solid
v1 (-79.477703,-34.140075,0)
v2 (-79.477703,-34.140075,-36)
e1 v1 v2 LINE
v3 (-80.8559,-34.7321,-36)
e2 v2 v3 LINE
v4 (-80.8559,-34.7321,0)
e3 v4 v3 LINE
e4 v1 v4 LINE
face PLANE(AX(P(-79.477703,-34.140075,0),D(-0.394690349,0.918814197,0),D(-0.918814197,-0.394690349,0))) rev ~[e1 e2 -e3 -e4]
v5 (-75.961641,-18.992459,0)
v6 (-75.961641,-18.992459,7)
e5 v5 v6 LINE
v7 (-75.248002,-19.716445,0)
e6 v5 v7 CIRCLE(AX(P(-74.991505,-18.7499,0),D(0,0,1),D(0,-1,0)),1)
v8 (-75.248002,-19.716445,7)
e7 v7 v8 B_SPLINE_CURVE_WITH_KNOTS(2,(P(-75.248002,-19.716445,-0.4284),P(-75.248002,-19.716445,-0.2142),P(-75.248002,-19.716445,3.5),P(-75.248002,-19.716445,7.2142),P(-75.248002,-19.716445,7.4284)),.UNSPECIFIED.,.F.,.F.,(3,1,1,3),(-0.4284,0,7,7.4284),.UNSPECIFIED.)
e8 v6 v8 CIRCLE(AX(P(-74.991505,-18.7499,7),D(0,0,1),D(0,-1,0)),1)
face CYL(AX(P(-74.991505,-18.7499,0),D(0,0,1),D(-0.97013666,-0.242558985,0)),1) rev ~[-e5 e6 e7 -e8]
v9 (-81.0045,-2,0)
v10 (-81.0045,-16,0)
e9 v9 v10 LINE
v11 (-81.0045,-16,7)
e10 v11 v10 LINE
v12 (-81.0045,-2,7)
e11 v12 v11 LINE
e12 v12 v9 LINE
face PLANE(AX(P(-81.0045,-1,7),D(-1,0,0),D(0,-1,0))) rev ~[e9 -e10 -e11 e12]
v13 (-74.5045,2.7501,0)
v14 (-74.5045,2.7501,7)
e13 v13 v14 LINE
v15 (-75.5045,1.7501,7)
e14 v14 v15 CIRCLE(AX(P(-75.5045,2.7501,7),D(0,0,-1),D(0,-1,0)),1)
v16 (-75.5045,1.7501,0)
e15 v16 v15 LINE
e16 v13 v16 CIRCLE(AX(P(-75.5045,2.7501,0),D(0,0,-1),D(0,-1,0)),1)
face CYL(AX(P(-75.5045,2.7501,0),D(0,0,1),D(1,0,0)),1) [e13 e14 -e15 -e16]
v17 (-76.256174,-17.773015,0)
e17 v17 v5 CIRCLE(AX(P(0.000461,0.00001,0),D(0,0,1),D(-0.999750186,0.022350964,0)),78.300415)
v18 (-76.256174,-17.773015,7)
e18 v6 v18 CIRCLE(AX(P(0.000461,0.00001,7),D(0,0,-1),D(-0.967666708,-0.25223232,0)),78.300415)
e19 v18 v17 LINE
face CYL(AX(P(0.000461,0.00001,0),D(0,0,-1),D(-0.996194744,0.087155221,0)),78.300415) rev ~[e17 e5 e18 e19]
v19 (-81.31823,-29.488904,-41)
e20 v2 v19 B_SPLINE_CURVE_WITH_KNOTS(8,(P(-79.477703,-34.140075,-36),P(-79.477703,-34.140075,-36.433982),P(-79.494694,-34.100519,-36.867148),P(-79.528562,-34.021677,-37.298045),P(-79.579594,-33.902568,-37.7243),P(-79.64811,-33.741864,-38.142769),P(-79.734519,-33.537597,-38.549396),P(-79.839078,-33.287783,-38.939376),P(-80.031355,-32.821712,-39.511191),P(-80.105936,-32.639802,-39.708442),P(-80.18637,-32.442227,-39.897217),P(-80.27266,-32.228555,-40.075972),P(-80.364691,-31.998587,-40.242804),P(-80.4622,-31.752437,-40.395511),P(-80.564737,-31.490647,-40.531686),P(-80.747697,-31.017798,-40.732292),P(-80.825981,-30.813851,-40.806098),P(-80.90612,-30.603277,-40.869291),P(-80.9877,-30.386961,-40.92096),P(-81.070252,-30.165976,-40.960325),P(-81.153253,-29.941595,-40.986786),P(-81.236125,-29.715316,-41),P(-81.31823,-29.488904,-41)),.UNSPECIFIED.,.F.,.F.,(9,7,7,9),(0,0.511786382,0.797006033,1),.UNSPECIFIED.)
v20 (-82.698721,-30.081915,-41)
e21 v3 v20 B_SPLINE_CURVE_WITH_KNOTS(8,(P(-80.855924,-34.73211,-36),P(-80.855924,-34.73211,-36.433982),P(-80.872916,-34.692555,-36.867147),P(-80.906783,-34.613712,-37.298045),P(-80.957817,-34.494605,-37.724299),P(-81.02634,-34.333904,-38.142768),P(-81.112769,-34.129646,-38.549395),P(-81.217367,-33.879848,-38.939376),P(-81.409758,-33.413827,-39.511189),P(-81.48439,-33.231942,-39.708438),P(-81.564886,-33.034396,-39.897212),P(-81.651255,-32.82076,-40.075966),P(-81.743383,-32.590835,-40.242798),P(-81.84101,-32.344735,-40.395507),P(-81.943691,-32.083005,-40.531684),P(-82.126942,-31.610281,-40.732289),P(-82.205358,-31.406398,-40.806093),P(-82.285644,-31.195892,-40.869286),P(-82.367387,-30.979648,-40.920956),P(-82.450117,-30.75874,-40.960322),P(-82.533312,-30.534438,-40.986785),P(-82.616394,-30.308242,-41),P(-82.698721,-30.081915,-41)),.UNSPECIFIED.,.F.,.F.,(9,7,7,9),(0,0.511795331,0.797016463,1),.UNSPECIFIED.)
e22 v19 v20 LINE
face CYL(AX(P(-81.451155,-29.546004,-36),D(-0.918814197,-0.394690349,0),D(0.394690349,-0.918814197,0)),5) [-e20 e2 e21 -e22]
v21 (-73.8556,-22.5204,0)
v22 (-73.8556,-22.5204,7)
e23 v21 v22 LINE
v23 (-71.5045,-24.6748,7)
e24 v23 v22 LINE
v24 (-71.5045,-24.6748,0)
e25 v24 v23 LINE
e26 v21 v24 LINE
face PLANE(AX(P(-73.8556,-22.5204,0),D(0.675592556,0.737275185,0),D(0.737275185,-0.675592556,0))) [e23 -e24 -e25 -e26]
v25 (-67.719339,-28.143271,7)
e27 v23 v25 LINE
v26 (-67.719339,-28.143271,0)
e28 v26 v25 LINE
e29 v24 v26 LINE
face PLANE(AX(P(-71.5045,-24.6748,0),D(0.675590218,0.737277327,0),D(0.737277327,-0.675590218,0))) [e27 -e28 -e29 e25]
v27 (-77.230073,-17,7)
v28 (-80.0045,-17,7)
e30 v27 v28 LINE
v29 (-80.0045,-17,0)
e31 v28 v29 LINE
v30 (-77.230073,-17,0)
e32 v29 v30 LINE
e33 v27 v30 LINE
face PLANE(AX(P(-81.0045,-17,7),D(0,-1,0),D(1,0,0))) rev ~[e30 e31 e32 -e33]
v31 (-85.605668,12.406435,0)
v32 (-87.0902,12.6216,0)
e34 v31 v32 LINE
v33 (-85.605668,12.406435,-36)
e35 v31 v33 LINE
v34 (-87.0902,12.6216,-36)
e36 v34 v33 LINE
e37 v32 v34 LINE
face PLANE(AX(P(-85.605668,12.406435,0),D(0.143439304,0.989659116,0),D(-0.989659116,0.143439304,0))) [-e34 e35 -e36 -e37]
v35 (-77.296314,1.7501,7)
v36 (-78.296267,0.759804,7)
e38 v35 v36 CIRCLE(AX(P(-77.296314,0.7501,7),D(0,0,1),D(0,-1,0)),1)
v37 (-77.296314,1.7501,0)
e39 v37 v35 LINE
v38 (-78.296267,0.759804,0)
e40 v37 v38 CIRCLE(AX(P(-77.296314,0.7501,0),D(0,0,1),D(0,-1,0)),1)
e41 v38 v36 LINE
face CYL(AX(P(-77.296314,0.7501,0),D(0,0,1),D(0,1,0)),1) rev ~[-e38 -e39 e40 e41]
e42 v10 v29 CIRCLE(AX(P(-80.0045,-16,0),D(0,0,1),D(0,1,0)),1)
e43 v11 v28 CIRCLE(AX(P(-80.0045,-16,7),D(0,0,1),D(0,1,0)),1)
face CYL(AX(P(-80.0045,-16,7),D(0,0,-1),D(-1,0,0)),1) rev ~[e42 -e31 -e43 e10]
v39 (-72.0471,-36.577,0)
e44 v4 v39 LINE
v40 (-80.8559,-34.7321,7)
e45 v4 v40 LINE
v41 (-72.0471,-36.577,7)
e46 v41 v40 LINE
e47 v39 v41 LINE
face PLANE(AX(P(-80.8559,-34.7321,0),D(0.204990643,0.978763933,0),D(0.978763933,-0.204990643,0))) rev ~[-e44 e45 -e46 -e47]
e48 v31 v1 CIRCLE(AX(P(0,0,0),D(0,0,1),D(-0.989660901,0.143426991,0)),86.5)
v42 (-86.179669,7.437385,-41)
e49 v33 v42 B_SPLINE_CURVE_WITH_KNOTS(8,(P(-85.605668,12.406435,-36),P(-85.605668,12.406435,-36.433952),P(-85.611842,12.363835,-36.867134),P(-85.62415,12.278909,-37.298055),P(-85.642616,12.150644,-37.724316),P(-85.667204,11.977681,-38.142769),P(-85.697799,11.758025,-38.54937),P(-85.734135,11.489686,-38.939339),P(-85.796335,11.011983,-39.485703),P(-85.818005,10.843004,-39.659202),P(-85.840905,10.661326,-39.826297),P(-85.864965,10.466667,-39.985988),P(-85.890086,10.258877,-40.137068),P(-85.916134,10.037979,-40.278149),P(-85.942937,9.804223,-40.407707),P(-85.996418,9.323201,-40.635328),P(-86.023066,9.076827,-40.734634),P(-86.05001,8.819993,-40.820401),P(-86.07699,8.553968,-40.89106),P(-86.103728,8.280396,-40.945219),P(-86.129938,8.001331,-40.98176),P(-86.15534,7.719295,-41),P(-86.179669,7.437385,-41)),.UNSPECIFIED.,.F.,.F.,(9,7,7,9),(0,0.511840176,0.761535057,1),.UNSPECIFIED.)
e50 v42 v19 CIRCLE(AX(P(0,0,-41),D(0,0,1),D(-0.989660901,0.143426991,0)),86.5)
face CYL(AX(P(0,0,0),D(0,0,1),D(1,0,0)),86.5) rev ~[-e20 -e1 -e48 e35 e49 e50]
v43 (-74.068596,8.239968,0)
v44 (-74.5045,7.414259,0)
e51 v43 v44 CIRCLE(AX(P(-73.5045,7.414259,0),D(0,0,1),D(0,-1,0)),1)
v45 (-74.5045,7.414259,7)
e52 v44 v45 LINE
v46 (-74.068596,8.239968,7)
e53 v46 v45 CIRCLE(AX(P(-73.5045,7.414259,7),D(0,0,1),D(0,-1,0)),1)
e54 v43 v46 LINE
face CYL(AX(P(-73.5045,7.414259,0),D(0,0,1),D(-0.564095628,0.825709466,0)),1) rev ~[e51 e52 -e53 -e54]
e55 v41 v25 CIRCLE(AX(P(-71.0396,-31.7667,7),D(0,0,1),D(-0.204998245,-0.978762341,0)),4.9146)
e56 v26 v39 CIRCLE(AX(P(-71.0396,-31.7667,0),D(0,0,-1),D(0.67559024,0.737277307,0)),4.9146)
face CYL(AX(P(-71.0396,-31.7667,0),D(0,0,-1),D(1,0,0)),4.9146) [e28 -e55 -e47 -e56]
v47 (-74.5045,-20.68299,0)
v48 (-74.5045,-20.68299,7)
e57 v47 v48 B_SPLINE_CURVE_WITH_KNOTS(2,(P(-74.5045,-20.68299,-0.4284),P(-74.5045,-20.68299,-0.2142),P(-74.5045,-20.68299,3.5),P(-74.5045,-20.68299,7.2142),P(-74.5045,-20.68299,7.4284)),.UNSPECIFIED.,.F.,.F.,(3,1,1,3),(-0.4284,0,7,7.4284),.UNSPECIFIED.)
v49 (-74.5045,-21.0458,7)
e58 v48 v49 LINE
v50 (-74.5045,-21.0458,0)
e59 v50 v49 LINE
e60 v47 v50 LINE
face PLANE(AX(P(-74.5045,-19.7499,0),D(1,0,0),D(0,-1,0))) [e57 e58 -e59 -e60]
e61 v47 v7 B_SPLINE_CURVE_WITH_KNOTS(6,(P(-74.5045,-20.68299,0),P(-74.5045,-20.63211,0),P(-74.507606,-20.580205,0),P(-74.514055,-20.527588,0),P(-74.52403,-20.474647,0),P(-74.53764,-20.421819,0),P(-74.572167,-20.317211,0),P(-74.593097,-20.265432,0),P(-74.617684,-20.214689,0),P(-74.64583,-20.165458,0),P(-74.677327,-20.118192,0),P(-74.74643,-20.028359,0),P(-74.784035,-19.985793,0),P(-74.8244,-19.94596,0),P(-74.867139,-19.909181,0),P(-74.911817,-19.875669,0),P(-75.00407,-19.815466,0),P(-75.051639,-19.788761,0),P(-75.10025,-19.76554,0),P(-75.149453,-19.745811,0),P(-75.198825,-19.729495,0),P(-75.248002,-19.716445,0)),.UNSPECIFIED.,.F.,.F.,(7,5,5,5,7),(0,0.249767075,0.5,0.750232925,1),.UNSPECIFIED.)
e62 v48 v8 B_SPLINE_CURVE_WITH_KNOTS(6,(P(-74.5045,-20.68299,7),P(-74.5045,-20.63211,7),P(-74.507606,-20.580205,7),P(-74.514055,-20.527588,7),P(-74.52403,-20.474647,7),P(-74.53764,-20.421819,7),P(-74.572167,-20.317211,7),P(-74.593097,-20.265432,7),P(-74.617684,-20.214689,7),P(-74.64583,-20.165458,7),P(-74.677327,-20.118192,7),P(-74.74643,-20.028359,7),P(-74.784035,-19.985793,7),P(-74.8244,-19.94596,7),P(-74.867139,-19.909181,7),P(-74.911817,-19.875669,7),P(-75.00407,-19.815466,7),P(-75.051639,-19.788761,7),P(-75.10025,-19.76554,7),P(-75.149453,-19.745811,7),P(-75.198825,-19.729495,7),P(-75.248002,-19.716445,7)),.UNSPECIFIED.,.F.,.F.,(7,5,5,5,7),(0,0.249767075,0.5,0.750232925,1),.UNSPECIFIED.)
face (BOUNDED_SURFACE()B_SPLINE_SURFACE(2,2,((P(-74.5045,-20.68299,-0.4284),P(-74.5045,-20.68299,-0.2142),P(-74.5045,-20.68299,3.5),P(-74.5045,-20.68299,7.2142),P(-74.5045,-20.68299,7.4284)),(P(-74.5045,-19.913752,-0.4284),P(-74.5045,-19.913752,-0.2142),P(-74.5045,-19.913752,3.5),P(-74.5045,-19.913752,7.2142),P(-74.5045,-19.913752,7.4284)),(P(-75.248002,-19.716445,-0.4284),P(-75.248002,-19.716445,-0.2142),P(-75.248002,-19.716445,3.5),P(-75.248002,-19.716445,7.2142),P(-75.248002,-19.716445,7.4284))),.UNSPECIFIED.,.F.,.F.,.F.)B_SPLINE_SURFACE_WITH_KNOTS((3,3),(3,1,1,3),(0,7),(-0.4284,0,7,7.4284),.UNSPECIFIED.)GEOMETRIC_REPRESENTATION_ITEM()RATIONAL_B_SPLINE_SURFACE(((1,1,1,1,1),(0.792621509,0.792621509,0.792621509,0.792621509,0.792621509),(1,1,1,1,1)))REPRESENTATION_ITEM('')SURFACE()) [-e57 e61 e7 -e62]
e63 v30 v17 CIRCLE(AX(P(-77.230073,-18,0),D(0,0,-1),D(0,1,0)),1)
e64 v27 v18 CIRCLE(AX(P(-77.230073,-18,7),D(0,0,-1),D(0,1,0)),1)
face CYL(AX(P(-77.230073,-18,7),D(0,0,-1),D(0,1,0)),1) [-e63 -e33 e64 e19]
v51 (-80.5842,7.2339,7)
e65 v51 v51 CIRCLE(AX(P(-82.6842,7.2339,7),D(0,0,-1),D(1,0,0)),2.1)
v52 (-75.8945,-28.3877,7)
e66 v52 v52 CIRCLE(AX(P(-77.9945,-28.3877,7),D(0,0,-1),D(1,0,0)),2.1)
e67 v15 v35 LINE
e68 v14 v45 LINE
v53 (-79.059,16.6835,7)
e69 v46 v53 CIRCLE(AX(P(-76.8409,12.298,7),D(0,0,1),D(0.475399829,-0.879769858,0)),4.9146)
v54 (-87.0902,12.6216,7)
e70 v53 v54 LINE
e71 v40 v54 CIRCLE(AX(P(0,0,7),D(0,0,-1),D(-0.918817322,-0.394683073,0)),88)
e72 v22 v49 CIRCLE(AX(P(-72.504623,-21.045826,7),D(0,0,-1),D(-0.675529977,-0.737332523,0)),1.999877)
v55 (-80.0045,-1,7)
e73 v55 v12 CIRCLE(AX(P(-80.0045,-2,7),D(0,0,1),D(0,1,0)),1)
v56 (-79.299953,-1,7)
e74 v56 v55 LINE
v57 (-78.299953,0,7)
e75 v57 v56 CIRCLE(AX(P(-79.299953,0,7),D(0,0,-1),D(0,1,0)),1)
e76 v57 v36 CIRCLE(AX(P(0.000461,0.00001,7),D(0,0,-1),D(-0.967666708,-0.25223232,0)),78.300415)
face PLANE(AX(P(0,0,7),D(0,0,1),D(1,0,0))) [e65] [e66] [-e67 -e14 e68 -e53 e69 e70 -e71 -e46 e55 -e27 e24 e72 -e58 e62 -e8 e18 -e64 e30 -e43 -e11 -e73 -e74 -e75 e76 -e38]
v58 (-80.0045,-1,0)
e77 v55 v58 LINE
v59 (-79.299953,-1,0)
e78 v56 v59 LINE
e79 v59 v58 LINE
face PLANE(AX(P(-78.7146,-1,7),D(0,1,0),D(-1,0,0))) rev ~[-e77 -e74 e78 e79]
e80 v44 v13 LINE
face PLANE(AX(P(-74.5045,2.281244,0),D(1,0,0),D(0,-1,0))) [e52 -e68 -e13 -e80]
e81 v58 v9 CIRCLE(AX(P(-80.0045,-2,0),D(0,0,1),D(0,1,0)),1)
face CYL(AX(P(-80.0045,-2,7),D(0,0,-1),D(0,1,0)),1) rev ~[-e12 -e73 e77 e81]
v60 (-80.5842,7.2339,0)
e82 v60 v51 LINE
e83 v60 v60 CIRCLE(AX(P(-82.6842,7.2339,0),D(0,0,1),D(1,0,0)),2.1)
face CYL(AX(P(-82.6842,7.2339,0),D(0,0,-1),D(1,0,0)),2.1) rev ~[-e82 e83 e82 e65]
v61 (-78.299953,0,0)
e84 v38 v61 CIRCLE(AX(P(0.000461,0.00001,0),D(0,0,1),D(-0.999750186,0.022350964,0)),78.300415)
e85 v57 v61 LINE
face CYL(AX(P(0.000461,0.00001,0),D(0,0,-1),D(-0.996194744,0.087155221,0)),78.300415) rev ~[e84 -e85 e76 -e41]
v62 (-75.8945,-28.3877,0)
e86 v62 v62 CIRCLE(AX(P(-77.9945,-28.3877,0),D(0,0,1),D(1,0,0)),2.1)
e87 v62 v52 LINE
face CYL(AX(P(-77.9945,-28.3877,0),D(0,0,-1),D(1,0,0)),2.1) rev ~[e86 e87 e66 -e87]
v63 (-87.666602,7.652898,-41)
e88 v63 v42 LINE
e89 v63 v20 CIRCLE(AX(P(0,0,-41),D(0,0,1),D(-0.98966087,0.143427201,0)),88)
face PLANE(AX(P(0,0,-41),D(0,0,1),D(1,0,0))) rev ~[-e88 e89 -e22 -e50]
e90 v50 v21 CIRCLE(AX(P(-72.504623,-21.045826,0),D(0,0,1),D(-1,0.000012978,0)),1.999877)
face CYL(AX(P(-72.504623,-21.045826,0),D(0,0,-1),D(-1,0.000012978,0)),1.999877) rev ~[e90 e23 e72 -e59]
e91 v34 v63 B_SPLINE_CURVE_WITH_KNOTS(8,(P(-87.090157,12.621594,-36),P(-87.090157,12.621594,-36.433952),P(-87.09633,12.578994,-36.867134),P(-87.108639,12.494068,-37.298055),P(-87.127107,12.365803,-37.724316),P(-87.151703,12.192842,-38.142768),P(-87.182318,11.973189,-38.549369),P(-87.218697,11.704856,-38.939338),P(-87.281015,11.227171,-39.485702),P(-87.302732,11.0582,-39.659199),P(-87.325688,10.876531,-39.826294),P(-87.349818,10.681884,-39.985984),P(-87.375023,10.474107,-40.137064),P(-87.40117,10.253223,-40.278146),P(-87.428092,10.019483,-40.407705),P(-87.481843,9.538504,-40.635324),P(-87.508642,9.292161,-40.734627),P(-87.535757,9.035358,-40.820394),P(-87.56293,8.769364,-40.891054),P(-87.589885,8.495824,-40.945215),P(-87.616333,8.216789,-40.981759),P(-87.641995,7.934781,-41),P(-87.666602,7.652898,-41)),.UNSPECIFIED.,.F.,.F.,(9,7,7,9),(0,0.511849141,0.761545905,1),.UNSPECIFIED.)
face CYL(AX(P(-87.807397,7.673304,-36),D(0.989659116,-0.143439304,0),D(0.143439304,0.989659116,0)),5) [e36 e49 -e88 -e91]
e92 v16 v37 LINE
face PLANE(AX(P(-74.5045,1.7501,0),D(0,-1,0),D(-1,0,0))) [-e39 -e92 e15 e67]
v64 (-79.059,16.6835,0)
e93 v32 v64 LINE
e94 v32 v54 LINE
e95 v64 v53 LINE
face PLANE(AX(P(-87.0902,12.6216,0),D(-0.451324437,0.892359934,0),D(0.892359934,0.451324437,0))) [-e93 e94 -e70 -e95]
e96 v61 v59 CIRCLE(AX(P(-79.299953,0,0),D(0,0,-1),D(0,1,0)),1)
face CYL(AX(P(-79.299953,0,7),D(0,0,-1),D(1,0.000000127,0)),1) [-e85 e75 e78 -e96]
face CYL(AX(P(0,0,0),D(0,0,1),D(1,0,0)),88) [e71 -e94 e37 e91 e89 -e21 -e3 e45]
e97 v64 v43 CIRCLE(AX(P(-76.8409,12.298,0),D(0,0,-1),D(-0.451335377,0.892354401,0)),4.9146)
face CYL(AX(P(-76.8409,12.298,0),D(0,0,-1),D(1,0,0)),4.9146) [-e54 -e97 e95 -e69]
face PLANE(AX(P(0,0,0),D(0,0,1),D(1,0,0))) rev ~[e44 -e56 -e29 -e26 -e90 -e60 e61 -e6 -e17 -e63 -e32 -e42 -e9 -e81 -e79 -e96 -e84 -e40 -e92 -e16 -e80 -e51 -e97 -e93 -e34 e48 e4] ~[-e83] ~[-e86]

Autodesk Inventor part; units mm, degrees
ref_plane "YZ Plane" through (0, 0, 0) normal (1, 0, 0) x (0, 1, 0)
ref_plane "XZ Plane" through (0, 0, 0) normal (0, 1, 0) x (-1, 0, 0)
ref_plane "XY Plane" through (0, 0, 0) normal (0, 0, 1) x (1, 0, 0)
sketch "Skizze1" plane through (0, 0, 0) normal (0, 0, 1) x (1, 0, 0)
  circle A0 centre (0, 0) radius 88
  circle A1 centre (-82.6842, 7.2339) radius 2.1
  arc A2 (-78.002, 6.8243) -> (-73.5779, -26.7802) centre (0, 0) ccw
  circle A3 centre (-82.6842, 7.2339) radius 4.7
  circle A4 centre (-77.9945, -28.3877) radius 2.1
  circle A5 centre (-77.9945, -28.3877) radius 4.7
  circle A6 centre (0, 0) radius 78.3
  circle A7 centre (0, 0) radius 86.5
  arc A8 (-84.1729, 21.9984) -> (-86.4353, 9.8964) centre (0, 0) ccw
  line L0 (0, 0) -> (-82.0101, 11.8853)
  line L1 (-82.0101, 11.8853) -> (-87.0902, 12.6216)
  line L2 (0, 0) -> (-76.1395, -32.7061)
  line L3 (-76.1395, -32.7061) -> (-80.8559, -34.7321)
  line L4 (0, 0) -> (-82.828, 2.5361)
  line L5 (-82.828, 2.5361) -> (-87.9588, 2.6932)
  line L6 (0, 0) -> (-79.3493, -23.8872)
  line L7 (-79.3493, -23.8872) -> (-84.2646, -25.3669)
  line L8 (-78.3816, 80.7625) -> (-42.1157, 57.6586)
  line L9 (-42.1157, 57.6586) -> (-70.0553, 13.8022)
  line L10 (-70.0553, 13.8022) -> (-106.3212, 36.9061)
  line L11 (-106.3212, 36.9061) -> (-78.3816, 80.7625)
  line L12 (-56.0855, 35.7304) -> (-92.3514, 58.8343) construction
  line L13 (-64.096, -31.4636) -> (-25.7575, -66.5943)
  line L14 (-25.7575, -66.5943) -> (-54.8079, -98.2972)
  line L15 (-54.8079, -98.2972) -> (-93.1463, -63.1665)
  line L16 (-93.1463, -63.1665) -> (-64.096, -31.4636)
  line L17 (-47.7296, -52.0877) -> (-73.9771, -80.7319) construction
  arc A9 (-44.3621, 76) -> (44.3621, 76) centre (0, 0) ccw
  line L18 (13, 63) -> (-13, 63)
  line L19 (0, 63) -> (0, -88)
  line L20 (0, 0) -> (-56.0855, 35.7304) construction
  line L21 (0, 0) -> (-44.9267, -49.0289) construction
  line L22 (0, 0) -> (-88, 0)
  line L23 (0, 0) -> (-86.6631, 15.281) construction
  line L24 (0, 0) -> (-79.7551, -37.1904) construction
  circle A10 centre (0, 0) radius 83 construction
  line L25 (-63.2545, -17.7499) -> (-72.5045, -17.7499)
  arc A11 (-72.5045, -17.7499) -> (-74.5045, -19.7499) centre (-72.5045, -19.7499) ccw
  line L26 (-74.5045, -19.7499) -> (-74.5045, -21.0458)
  arc A12 (-74.5045, -21.0458) -> (-73.8556, -22.5204) centre (-72.5045, -21.0458) ccw
  line L27 (-73.8556, -22.5204) -> (-71.5045, -24.6748)
  line L28 (-71.5045, -24.6748) -> (-52.6253, -41.9744)
  arc A13 (-52.6253, -41.9744) -> (-51.2741, -42.4999) centre (-51.2741, -40.4999) ccw
  line L29 (-51.2741, -42.4999) -> (51.2741, -42.4999)
  arc A14 (51.2741, -42.4999) -> (52.6253, -41.9744) centre (51.2741, -40.4999) ccw
  line L30 (52.6253, -41.9744) -> (71.5045, -24.6748)
  line L31 (71.5045, -24.6748) -> (73.8557, -22.5204)
  arc A15 (73.8557, -22.5204) -> (74.5045, -21.0458) centre (72.5045, -21.0458) ccw
  line L32 (74.5045, -21.0458) -> (74.5045, -19.7499)
  arc A16 (74.5045, -19.7499) -> (72.5045, -17.7499) centre (72.5045, -19.7499) ccw
  line L33 (72.5045, -17.7499) -> (63.2545, -17.7499)
  arc A17 (61.2545, -15.7499) -> (63.2545, -17.7499) centre (63.2545, -15.7499) ccw
  line L34 (61.2545, -15.7499) -> (61.2545, -2.2499)
  arc A18 (63.2545, -0.2499) -> (61.2545, -2.2499) centre (63.2545, -2.2499) ccw
  line L35 (63.2545, -0.2499) -> (72.5045, -0.2499)
  arc A19 (72.5045, -0.2499) -> (74.5045, 1.7501) centre (72.5045, 1.7501) ccw
  line L36 (74.5045, 1.7501) -> (74.5045, 6.2357)
  arc A20 (74.5045, 6.2357) -> (74.1913, 7.3103) centre (72.5045, 6.2357) ccw
  line L37 (74.1913, 7.3103) -> (66.8685, 18.8046)
  line L38 (66.8685, 18.8046) -> (66.8312, 18.8625)
  line L39 (66.8312, 18.8625) -> (63.3633, 24.3061)
  line L40 (63.3633, 24.3061) -> (61.5013, 27.2292)
  arc A21 (61.5013, 27.2292) -> (61.4647, 27.2866) centre (58.5872, 25.413) ccw
  line L41 (61.4647, 27.2866) -> (59.6025, 30.21)
  line L42 (59.6025, 30.21) -> (59.5849, 30.2372)
  line L43 (59.5849, 30.2372) -> (52.3622, 41.5747)
  arc A22 (52.3622, 41.5747) -> (50.6754, 42.5001) centre (50.6754, 40.5001) ccw
  line L44 (50.6754, 42.5001) -> (34.4476, 42.5001)
  arc A23 (33.1728, 42.9591) -> (34.4476, 42.5001) centre (34.4477, 44.5002) ccw
  arc A24 (33.1728, 42.9591) -> (28.0733, 42.9591) centre (30.623, 39.877) ccw
  arc A25 (26.7984, 42.5001) -> (28.0733, 42.9591) centre (26.7984, 44.5002) ccw
  line L45 (26.7984, 42.5001) -> (-26.7984, 42.5001)
  arc A26 (-28.0733, 42.9591) -> (-26.7984, 42.5001) centre (-26.7984, 44.5002) ccw
  arc A27 (-28.0733, 42.9591) -> (-33.1728, 42.9591) centre (-30.623, 39.877) ccw
  arc A28 (-34.4476, 42.5001) -> (-33.1728, 42.9591) centre (-34.4477, 44.5002) ccw
  line L46 (-34.4476, 42.5001) -> (-50.6754, 42.5001)
  arc A29 (-50.6754, 42.5001) -> (-52.3622, 41.5747) centre (-50.6754, 40.5001) ccw
  line L47 (-52.3622, 41.5747) -> (-59.5849, 30.2372)
  line L48 (-59.5849, 30.2372) -> (-59.6025, 30.21)
  line L49 (-59.6025, 30.21) -> (-61.4647, 27.2866)
  arc A30 (-61.4647, 27.2866) -> (-61.5013, 27.2292) centre (-58.5191, 25.37) ccw
  line L50 (-61.5013, 27.2292) -> (-63.3633, 24.3061)
  line L51 (-63.3633, 24.3061) -> (-66.8312, 18.8625)
  line L52 (-66.8312, 18.8625) -> (-66.8685, 18.8046)
  line L53 (-66.8685, 18.8046) -> (-74.1912, 7.3103)
  arc A31 (-74.1912, 7.3103) -> (-74.5045, 6.2357) centre (-72.5045, 6.2357) ccw
  line L54 (-74.5045, 6.2357) -> (-74.5045, 1.7501)
  arc A32 (-74.5045, 1.7501) -> (-72.5045, -0.2499) centre (-72.5045, 1.7501) ccw
  line L55 (-72.5045, -0.2499) -> (-63.2545, -0.2499)
  arc A33 (-61.2545, -2.2499) -> (-63.2545, -0.2499) centre (-63.2545, -2.2499) ccw
  line L56 (-61.2545, -2.2499) -> (-61.2545, -15.7499)
  arc A34 (-63.2545, -17.7499) -> (-61.2545, -15.7499) centre (-63.2545, -15.7499) ccw
  line L57 (-82.6842, 7.2339) -> (-80.4481, 20.4232)
  circle A35 centre (-76.8409, 12.298) radius 4.9146
  circle A36 centre (-76.8409, 12.298) radius 4
  line L58 (-74.5045, 1.7501) -> (-78.2804, 1.7501)
  line L59 (-74.5045, -19.7499) -> (-75.7683, -19.7499)
  line L60 (-87.0902, 12.6216) -> (-79.059, 16.6835)
  line L61 (-77.9945, -28.3877) -> (-72.421, -40.5488)
  circle A37 centre (-71.0396, -31.7667) radius 4.9146
  circle A38 centre (-71.0396, -31.7667) radius 4
  line L62 (-80.8559, -34.7321) -> (-72.0471, -36.577)
  line L63 (-74.5045, 6.2357) -> (-74.5045, 10.7976)
  line L64 (-77.9945, -28.3877) -> (-73.2945, -28.3877)
  line L65 (-73.2945, -28.3877) -> (-73.2945, -31.484)
  line L66 (-73.2945, -28.3877) -> (-73.2945, -23.0346)
  point P0 (0, 0)
  point P1 (-85.6057, 12.4064)
  point P2 (-79.4777, -34.1401)
  point P3 (0, 0)
  point P4 (-74.9054, -43.26)
  point P5 (-83.5496, 22.399)
  point P6 (-86.1005, 12.4781)
  point P7 (-86.4122, 10.096)
  point P8 (-71.9434, -30.9037)
  point P9 (-77.4904, 11.2303)
  point P10 (-72.696, 9.6574)
  point P11 (-67.7194, -28.1432)
  point P12 (-67.103, -28.8245)
  point P13 (-74.5045, 7.9743)
  dimension "d0" = 9.4
  dimension "d1" = 173
  dimension "d8" = 52
  dimension "d9" = 43
  dimension "d10" = 43
  dimension "d11" = 52
  dimension "d12" = 66.5
  dimension "d13" = 90
  dimension "d14" = 90
  dimension "d15" = 90
  dimension "d16" = 90
  dimension "d17" = 90
  dimension "d18" = 90
  dimension "d19" = 90
  dimension "d20" = 66.5
  dimension "d21" = 26
  dimension "d22" = 47.5
  dimension "d23" = 32.5
  dimension "d139" = 10
  dimension "d140" = 25
  dimension "d156" = 8
  dimension "d157" = 8
extrude "Extrusion1" add sketch "Skizze1" against normal blind 41 contours A0 L7 A7 A5 L3 | L1 A8 A3 A7 L5 A0 | A0 L22 A7 L7 | L5 A7 L22 A0 | L1 A7 A3 A8 | A5 A7 | A3 A7
extrude "Extrusion2" add sketch "Skizze1" along normal blind 7 contours A0 L7 A7 A5 L3 | L3 A7 L62 | L1 A8 A3 A7 L5 A0 | L60 A8 L1 | A0 L22 A7 L7 | L3 A5 L61 L62 A7 | A7 A5 L3 | L5 A7 L22 A0 | L1 A7 A3 A8 | A8 L60 A7 L1 | L60 L57 A3 L1 A7 | L7 A5 A7 | A7 L22 A2 L6 L7 | A7 A5 A37 L64 A4 L61 | A5 A7 | L61 A37 L62 | A37 L2 A38 A6 | A6 A38 L2 A37 | L54 L58 A2 L4 | L4 A2 A6 A35 L63 L54 | A12 L27 L66 A37 A6 A2 L6 | L6 A2 L59 L26 A12 | L5 L4 A2 L22 A7 | A7 A3 L5 | A3 A7 | L1 A3 A7 | L60 A35 L57 | A35 L0 A36 A6 | A6 A36 L0 A35 | L6 A2 A5 | L61 A4 L64 A37 A5 | A5 A37 L2 | L2 A37 L61 | A38 L2 A6 | A6 L2 A38 | A35 L63 A36 L0 | L2 A38 A6 L66 A37 | A37 L66 L27 L28 | L4 A3 A2 | A7 A3 A35 | A35 L0 L57 | A36 L0 A6 | A6 L0 A36 | A6 A37 A5 | A37 L64 A5 A38 | A5 A38 L2 A37 | L2 L65 A38 A6 | A6 A38 L2 | A38 A5 L65 L2 | A36 L63 L0 | A35 A6 A36 L63 | L66 A6 A37 | A3 A35 A6 | L0 A35 A3 | L0 A36 A3 A35 | L0 L63 A36 A6 | A6 A36 A3 L0 | A37 A6 L66 A5 | A5 L64 A37 | A38 A5 | A38 A5 L66 A6 | A35 A3 A36 A6 | A3 A36 A35 | A3 A36
sketch "Skizze7" plane through (0, 0, 7) normal (0, 0, 1) x (1, 0, 0)
  arc A0 (-75.2406, -20.5635) -> (-69.3003, -22.9246) centre (-71.3821, -19.509) ccw
  arc A1 (-77.999, 0.3892) -> (-75.2406, -20.5635) centre (0, 0) ccw
  arc A2 (-72.8723, 4.2072) -> (-77.999, 0.3892) centre (-73.9991, 0.3692) ccw
  arc A3 (-72.8723, 4.2072) -> (-61.6214, 8.4293) centre (-70.0553, 13.8022) ccw
  arc A4 (-73.0131, 3.7275) -> (-61.1997, 8.1606) centre (-70.0553, 13.8022) ccw
  arc A5 (-73.0131, 3.7275) -> (-77.499, 0.3867) centre (-73.9991, 0.3692) ccw
  arc A6 (-77.499, 0.3867) -> (-74.7582, -20.4317) centre (0, 0) ccw
  arc A7 (-74.7582, -20.4317) -> (-69.5605, -22.4976) centre (-71.3821, -19.509) ccw
  arc A8 (-57.0023, -23.7222) -> (-69.5605, -22.4976) centre (-64.096, -31.4636) ccw
  line L0 (-81.0045, -17) -> (-62.0045, -17)
  line L1 (-62.0045, -17) -> (-62.0045, -1)
  line L2 (-62.0045, -1) -> (-81.0045, -1)
  line L3 (-81.0045, -1) -> (-81.0045, -17)
  line L4 (-81.0045, -17) -> (-62.0045, -1) construction
  line L5 (-62.0045, -17) -> (-81.0045, -1) construction
  arc A9 (-75.2406, -20.5635) -> (-69.3003, -22.9246) centre (-71.3821, -19.509) ccw
  arc A10 (-77.999, 0.3892) -> (-75.2406, -20.5635) centre (0, 0) ccw
  arc A11 (-72.8723, 4.2072) -> (-77.999, 0.3892) centre (-73.9991, 0.3692) ccw
  arc A12 (-72.8723, 4.2072) -> (-61.6214, 8.4293) centre (-70.0553, 13.8022) ccw
  arc A13 (-73.0131, 3.7275) -> (-61.1997, 8.1606) centre (-70.0553, 13.8022) ccw
  arc A14 (-73.0131, 3.7275) -> (-77.499, 0.3867) centre (-73.9991, 0.3692) ccw
  arc A15 (-77.499, 0.3867) -> (-74.7582, -20.4317) centre (0, 0) ccw
  arc A16 (-74.7582, -20.4317) -> (-69.5605, -22.4976) centre (-71.3821, -19.509) ccw
  arc A17 (-57.0023, -23.7222) -> (-69.5605, -22.4976) centre (-64.096, -31.4636) ccw
  line L6 (0, 0) -> (-88, 0) construction
  line L7 (0, 0) -> (-70.4769, -25.6515) construction
  line L8 (0, 0) -> (-74.7146, 6.5367) construction
  circle A18 centre (-74.7146, 6.5367) radius 3
  line L9 (-74.7146, 6.5367) -> (-74.7146, -9.8771) construction
  line L10 (-78.7146, 6.5367) -> (-78.7146, -9.8771)
  line L11 (-70.7146, -9.8771) -> (-70.7146, 6.5367)
  arc A19 (-78.7146, -9.8771) -> (-70.7146, -9.8771) centre (-74.7146, -9.8771) ccw
  line L12 (-70.4769, -25.6515) -> (-70.4769, -13.0481) construction
  line L13 (-66.4769, -25.6515) -> (-66.4769, -13.0481)
  line L14 (-74.4769, -13.0481) -> (-74.4769, -25.6515)
  arc A20 (-66.4769, -13.0481) -> (-74.4769, -13.0481) centre (-70.4769, -13.0481) ccw
  point P0 (83.6944, 461.4718)
  point P1 (50.4138, 461.4718)
  point P2 (51.6944, 461.4718)
  point P3 (82.4138, 461.4718)
  point P4 (225.0044, 602.8331)
  point P5 (191.7237, 602.8331)
  point P6 (193.0044, 602.8331)
  point P7 (223.7237, 602.8331)
  point P8 (363.5869, 628.2091)
  point P9 (357.6097, 628.732)
  point P10 (362.0169, 595.2563)
  point P11 (367.655, 597.3084)
  point P12 (406.3129, 669.9339)
  point P13 (410.3051, 673.6839)
  point P14 (281.6601, 684.5107)
  point P15 (276.0219, 682.4586)
  point P16 (276.7768, 680.2764)
  point P17 (229.3797, 602.3331)
  point P18 (240.8641, 609.8331)
  point P19 (280.2544, 653.8611)
  point P20 (280.0901, 651.5579)
  point P21 (286.0672, 651.035)
  point P22 (286.3631, 657.444)
  point P23 (283.6046, 678.3966)
  point P24 (208.3641, 735.8331)
  point P25 (208.3641, 713.8331)
  point P26 (208.3641, 669.8331)
  point P27 (208.3641, 666.8331)
  point P28 (208.3641, 602.3331)
  point P29 (-74.7146, -1.6702)
  point P30 (-70.4769, -19.3498)
  point P31 (-61.892, 765.0568)
  point P32 (-53.892, 765.0568)
  point P33 (-66.1297, 787.0568)
  point P34 (-58.1297, 787.0568)
  point P35 (280.1559, 614.5868)
  point P36 (280.8975, 610.8357)
  point P37 (282.7456, 598.5868)
  dimension "d88" = 19
  dimension "d89" = 16
  dimension "d106" = 8
  dimension "d107" = 8
extrude "Extrusion6" cut sketch "Skizze7" against normal blind 41 contours L0 L3 L2 L10 A19 A1 | A1 A19 A6 L0 | A19 L10 L2 A1 | A1 L2 A6 A19 | A6 A19 L14 L0 | L14 A19 L11 A20 L13 L0 | A6 L2 L11 A20 L14 A19 | L13 A20 L11 L2 L1 L0 | L14 A20 L11 A19
fillet "Rundung2" radius 1 9 edges at (-81.0045, -17, 3.5) (-81.0045, -1, 3.5) (-78.2936, -1, 3.5) (-78.2804, 1.7501, 3.5) (-74.5045, 1.7501, 3.5) (-76.4323, -17, 3.5) (-75.7683, -19.7499, 3.5) (-74.5045, -19.7499, 3.5) (-74.5045, 7.9743, 3.5)
fillet "Rundung3" radius 5 2 edges at (-86.3479, 12.514, -41) (-80.1668, -34.4361, -41)
equation "\"d10\" = d9"
equation "\"d11\" = d8"
properties part number "Abdeckung"
